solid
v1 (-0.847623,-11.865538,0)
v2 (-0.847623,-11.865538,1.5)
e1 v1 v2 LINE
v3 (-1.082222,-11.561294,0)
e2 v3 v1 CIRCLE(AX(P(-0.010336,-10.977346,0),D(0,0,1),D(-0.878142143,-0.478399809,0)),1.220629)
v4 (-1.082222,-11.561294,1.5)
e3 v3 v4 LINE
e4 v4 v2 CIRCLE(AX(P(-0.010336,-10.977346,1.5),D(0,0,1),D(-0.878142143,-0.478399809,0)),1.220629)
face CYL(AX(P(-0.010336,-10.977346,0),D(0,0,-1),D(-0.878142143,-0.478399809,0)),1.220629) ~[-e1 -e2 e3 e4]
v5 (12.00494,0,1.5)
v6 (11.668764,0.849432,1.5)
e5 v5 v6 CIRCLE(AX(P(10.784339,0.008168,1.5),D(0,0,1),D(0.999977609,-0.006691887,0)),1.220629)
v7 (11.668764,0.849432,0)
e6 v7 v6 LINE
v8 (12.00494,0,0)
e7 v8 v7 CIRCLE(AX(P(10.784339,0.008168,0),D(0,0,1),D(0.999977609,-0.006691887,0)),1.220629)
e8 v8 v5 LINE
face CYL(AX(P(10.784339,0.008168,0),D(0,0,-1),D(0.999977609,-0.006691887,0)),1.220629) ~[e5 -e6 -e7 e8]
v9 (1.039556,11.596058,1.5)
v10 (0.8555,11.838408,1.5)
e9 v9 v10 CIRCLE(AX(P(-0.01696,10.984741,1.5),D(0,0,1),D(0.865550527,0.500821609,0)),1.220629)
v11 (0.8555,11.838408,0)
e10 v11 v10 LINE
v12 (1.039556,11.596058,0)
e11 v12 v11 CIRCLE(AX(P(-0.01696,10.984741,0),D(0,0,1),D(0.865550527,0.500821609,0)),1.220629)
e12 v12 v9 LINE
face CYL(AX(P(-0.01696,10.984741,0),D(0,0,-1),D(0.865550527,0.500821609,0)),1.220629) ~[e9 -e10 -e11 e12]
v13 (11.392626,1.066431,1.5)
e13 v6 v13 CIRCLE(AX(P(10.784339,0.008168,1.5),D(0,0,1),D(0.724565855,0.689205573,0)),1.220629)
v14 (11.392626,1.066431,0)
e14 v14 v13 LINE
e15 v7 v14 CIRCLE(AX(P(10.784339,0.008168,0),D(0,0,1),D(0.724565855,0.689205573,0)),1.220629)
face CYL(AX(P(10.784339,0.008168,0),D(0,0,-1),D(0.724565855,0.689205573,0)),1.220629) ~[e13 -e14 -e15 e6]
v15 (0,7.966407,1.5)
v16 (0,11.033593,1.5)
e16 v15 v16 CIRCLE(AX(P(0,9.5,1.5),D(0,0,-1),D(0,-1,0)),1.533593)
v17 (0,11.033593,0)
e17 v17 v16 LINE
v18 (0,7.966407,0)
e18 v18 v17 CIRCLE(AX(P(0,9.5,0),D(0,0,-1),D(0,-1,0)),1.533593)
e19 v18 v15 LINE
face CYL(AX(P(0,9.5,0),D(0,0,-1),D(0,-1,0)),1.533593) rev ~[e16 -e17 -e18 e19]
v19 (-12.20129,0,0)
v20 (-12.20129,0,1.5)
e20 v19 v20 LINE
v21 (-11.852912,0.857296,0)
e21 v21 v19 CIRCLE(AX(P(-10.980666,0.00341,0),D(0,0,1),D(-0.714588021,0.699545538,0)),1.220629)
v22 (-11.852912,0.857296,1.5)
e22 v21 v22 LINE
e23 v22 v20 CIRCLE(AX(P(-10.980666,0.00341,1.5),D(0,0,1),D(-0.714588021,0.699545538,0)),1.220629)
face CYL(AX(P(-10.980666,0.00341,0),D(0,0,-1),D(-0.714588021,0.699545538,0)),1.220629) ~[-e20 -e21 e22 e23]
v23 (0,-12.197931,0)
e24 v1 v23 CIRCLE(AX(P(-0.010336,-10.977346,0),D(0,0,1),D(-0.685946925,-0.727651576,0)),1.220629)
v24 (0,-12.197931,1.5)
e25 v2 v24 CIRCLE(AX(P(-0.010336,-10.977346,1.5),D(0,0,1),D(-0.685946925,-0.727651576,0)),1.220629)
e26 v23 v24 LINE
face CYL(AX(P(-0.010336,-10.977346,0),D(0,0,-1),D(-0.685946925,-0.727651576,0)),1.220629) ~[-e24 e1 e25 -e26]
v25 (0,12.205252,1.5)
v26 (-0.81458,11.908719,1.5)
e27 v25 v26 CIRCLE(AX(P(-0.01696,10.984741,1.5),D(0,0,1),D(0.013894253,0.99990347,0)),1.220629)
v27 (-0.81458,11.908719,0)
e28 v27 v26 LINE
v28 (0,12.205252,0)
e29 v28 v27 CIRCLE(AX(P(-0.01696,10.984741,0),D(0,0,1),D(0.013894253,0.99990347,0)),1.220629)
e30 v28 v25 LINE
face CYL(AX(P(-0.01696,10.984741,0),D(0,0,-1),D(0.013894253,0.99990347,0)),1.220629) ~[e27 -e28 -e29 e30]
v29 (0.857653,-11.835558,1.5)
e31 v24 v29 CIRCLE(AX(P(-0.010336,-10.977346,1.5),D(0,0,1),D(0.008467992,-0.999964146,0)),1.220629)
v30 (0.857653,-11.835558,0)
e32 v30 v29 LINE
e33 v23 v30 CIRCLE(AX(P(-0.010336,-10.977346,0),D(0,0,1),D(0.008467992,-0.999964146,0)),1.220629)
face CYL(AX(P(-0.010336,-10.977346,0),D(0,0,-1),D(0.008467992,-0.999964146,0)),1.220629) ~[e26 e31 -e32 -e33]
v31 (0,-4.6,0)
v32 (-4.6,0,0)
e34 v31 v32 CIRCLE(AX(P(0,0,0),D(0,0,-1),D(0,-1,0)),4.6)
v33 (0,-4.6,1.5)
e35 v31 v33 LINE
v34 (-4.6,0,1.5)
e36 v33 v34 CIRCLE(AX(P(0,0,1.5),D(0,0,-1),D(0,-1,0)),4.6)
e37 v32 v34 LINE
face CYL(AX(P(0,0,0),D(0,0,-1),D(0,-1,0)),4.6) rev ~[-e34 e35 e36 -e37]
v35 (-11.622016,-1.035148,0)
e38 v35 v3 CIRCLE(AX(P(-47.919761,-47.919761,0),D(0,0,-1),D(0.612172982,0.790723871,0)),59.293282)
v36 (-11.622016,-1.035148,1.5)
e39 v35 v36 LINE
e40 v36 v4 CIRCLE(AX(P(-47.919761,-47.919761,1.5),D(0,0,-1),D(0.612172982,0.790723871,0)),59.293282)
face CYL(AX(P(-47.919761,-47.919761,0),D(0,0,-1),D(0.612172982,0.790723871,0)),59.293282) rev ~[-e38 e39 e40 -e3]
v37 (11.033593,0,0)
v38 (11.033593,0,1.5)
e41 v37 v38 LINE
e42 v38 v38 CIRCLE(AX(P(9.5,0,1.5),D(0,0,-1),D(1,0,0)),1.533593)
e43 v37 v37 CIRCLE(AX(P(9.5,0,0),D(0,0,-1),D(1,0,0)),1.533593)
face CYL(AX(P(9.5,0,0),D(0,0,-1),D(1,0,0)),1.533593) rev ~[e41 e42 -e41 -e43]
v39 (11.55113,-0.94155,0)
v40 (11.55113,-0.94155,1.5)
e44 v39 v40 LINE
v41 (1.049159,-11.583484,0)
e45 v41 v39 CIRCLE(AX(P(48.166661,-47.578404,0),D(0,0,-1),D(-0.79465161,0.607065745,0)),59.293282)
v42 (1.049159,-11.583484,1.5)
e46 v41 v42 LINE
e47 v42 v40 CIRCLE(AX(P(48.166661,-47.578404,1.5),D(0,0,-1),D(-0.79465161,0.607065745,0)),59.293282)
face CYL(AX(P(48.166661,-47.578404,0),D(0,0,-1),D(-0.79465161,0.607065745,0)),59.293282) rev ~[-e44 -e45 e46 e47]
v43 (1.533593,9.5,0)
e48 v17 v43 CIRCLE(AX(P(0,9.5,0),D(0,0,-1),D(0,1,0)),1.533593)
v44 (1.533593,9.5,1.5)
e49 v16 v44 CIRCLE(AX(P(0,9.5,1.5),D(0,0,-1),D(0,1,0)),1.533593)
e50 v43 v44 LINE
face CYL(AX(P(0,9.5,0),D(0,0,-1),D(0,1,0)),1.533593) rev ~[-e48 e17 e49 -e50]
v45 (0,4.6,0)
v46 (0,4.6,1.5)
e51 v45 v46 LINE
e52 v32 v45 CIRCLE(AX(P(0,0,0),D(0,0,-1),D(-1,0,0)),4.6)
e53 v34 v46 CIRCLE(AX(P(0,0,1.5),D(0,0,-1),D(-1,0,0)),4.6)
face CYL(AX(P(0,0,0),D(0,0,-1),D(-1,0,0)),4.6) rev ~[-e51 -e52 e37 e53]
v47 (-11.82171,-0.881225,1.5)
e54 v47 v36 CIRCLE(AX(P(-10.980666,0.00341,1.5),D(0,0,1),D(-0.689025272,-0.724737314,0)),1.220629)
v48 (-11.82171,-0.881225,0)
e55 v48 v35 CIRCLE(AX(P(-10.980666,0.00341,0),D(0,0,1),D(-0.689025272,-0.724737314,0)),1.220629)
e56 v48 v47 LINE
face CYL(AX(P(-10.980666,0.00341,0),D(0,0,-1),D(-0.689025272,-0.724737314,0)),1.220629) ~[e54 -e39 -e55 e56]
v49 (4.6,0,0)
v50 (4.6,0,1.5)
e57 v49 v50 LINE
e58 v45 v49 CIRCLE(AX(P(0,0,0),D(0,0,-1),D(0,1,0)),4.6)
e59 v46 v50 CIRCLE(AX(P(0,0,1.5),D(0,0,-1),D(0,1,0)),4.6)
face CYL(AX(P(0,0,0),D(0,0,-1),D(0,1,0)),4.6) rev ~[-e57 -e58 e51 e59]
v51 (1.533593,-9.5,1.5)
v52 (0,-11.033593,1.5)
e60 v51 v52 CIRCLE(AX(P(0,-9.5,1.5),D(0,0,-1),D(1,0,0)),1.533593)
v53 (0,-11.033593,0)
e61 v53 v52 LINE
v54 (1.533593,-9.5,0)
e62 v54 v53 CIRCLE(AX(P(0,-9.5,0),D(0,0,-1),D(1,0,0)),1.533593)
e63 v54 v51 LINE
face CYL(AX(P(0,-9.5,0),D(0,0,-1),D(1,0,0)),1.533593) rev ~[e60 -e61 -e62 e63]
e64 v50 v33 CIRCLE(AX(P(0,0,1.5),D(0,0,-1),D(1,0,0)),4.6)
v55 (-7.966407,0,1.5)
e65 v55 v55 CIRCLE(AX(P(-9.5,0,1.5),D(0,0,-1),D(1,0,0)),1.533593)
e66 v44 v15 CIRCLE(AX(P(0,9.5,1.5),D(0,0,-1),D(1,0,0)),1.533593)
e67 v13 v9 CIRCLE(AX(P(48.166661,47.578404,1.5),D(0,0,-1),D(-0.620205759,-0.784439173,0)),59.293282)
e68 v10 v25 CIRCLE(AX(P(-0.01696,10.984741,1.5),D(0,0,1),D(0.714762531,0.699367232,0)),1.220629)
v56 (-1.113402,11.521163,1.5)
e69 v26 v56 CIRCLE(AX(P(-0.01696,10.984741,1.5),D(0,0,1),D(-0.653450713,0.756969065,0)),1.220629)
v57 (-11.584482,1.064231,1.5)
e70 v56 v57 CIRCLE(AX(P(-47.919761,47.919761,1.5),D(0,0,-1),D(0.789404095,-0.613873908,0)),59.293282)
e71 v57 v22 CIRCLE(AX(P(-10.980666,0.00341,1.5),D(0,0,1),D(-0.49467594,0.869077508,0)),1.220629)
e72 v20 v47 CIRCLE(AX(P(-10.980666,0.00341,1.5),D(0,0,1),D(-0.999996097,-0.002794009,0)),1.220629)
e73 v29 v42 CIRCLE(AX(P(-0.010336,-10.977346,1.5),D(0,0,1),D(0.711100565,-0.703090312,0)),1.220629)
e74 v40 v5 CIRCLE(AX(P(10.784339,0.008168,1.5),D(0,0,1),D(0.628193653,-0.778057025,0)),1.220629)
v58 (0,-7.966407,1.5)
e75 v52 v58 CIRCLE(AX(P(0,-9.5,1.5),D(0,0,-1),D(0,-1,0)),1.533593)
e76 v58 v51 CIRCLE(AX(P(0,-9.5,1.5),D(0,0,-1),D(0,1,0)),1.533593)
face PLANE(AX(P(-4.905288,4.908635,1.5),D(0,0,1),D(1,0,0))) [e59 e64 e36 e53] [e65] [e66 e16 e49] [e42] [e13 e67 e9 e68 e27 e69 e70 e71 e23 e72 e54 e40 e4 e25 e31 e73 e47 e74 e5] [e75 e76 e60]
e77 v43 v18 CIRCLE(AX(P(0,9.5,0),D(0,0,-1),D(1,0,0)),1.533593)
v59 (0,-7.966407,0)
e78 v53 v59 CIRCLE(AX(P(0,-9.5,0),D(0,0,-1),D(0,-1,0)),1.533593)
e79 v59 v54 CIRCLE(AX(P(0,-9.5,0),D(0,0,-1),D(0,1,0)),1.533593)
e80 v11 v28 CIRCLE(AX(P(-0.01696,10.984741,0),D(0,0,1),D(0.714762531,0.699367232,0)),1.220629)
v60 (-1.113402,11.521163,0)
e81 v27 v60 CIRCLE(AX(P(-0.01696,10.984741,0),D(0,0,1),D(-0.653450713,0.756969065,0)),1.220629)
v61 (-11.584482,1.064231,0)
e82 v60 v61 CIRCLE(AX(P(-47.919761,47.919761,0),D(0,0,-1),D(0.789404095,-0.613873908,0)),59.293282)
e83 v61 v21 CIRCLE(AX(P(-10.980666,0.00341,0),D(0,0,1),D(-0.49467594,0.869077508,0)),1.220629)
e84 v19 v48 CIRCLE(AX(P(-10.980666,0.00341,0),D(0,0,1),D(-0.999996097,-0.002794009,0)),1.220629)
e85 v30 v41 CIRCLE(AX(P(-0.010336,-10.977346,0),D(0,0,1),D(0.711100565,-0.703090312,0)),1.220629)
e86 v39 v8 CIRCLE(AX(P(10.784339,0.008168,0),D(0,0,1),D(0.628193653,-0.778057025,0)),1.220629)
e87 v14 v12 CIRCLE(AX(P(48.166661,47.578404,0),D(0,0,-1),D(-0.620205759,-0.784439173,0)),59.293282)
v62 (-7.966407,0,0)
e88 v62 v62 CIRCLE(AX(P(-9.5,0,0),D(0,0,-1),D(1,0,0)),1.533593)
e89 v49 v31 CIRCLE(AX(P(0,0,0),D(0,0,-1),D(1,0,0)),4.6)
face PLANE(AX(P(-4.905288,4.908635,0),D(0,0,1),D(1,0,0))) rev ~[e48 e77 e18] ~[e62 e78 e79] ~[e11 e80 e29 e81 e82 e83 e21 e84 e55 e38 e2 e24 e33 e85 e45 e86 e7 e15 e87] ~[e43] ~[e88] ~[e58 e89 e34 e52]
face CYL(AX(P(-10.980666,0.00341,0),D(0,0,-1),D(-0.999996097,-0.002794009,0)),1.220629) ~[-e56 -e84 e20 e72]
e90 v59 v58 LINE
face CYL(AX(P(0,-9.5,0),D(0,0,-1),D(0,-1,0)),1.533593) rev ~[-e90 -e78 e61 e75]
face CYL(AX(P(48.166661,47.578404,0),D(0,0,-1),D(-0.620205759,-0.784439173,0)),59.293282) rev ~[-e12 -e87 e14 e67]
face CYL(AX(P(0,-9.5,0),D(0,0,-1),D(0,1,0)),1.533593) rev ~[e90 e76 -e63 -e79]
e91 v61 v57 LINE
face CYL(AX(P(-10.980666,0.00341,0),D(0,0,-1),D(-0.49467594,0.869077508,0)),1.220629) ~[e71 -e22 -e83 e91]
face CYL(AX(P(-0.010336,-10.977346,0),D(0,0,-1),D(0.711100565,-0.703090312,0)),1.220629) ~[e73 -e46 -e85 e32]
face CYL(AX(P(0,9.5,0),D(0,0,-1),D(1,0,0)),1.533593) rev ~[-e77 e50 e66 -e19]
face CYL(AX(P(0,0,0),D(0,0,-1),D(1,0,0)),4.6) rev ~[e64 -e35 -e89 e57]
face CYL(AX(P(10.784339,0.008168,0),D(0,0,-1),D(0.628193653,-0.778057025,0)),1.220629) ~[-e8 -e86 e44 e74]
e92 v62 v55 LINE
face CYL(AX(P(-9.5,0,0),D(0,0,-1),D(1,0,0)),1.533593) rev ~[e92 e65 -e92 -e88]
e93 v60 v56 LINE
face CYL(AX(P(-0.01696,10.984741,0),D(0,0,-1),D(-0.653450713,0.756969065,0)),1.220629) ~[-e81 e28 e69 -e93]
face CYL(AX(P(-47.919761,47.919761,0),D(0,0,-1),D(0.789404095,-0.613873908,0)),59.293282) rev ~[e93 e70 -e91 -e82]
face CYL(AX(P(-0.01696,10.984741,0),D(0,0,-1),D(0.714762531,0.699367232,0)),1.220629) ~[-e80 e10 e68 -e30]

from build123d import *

# Parameters (mm, degrees)
F1_DEPTH = 1.5


with BuildPart() as f1:
    # F0 (on Top) → F1 (new body)
    with BuildSketch(Plane.XY):
        with BuildLine():
            ThreePointArc((-11.0335932724, 0), (-9.5, 1.5335932724), (-7.9664067276, 0))
            Line((-7.9664067276, 0), (-4.6, 0))
            ThreePointArc((-4.6, 0), (-3.2526911935, 3.2526911935), (0, 4.6))
            Line((0, 4.6), (0, 7.9664067276))
            ThreePointArc((0, 7.9664067276), (-1.5335932724, 9.5), (0, 11.0335932724))
            Line((0, 11.0335932724), (0, 12.2052515495))
            ThreePointArc((0, 12.2052515495), (-0.4345010394, 12.1317339839), (-0.8145803081, 11.9087188829))
            ThreePointArc((-0.8145803081, 11.9087188829), (-0.9635912872, 11.7146325201), (-1.1134019503, 11.5211627464))
            ThreePointArc((-1.1134019503, 11.5211627464), (-6.0214332546, 5.9647454006), (-11.5844815273, 1.064231252))
            ThreePointArc((-11.5844815273, 1.064231252), (-11.7185491453, 0.9605716693), (-11.8529124882, 0.8572956927))
            ThreePointArc((-11.8529124882, 0.8572956927), (-12.1114910997, 0.4629412091), (-12.2012897293, 0))
            Line((-12.2012897293, 0), (-11.0335932724, 0))
        make_face()
        with BuildLine():
            Line((-4.6, 0), (-7.9664067276, 0))
            ThreePointArc((-7.9664067276, 0), (-9.5, -1.5335932724), (-11.0335932724, 0))
            Line((-11.0335932724, 0), (-12.2012897293, 0))
            ThreePointArc((-12.2012897293, 0), (-12.1017179659, -0.4794729938), (-11.8217098669, -0.8812245989))
            ThreePointArc((-11.8217098669, -0.8812245989), (-11.721781237, -0.9580802015), (-11.6220162383, -1.0351480919))
            ThreePointArc((-11.6220162383, -1.0351480919), (-6.0202525949, -5.9659244981), (-1.0822216309, -11.5612941984))
            ThreePointArc((-1.0822216309, -11.5612941984), (-0.9646757294, -11.7132260984), (-0.8476226636, -11.8655380184))
            ThreePointArc((-0.8476226636, -11.8655380184), (-0.4559625925, -12.1137220892), (0, -12.1979305118))
            Line((0, -12.1979305118), (0, -11.0335932724))
            ThreePointArc((0, -11.0335932724), (-1.5335932724, -9.5), (0, -7.9664067276))
            Line((0, -7.9664067276), (0, -4.6))
            ThreePointArc((0, -4.6), (-3.2526911935, -3.2526911935), (-4.6, 0))
        make_face()
        with BuildLine():
            Line((0, 7.9664067276), (0, 4.6))
            ThreePointArc((0, 4.6), (3.2526911935, 3.2526911935), (4.6, 0))
            Line((4.6, 0), (7.9664067276, 0))
            ThreePointArc((7.9664067276, 0), (9.5, 1.5335932724), (11.0335932724, 0))
            Line((11.0335932724, 0), (12.0049398392, 0))
            ThreePointArc((12.0049398392, 0), (11.9193137164, 0.4573515512), (11.6687643937, 0.849432297))
            ThreePointArc((11.6687643937, 0.849432297), (11.5305346329, 0.9577272788), (11.3926261985, 1.0664311591))
            ThreePointArc((11.3926261985, 1.0664311591), (5.8870136821, 6.0076850195), (1.0395559509, 11.5960579882))
            ThreePointArc((1.0395559509, 11.5960579882), (0.9473724033, 11.7171151321), (0.8554998188, 11.838408441))
            ThreePointArc((0.8554998188, 11.838408441), (0.4640913385, 12.1065803567), (0, 12.2052515495))
            Line((0, 12.2052515495), (0, 11.0335932724))
            ThreePointArc((0, 11.0335932724), (1.0844142025, 10.5844142025), (1.5335932724, 9.5))
            ThreePointArc((1.5335932724, 9.5), (1.0844142025, 8.4155857975), (0, 7.9664067276))
        make_face()
        with BuildLine():
            ThreePointArc((4.6, 0), (3.2526911935, -3.2526911935), (0, -4.6))
            Line((0, -4.6), (0, -7.9664067276))
            ThreePointArc((0, -7.9664067276), (1.0844142025, -8.4155857975), (1.5335932724, -9.5))
            ThreePointArc((1.5335932724, -9.5), (1.0844142025, -10.5844142025), (0, -11.0335932724))
            Line((0, -11.0335932724), (0, -12.1979305118))
            ThreePointArc((0, -12.1979305118), (0.4647348704, -12.1017306528), (0.8576533678, -11.8355578385))
            ThreePointArc((0.8576533678, -11.8355578385), (0.9532380505, -11.7093930262), (1.0491591917, -11.5834838282))
            ThreePointArc((1.0491591917, -11.5834838282), (5.9633685423, -5.9301704288), (11.5511297333, -0.9415502985))
            ThreePointArc((11.5511297333, -0.9415502985), (11.8839118623, -0.5218059727), (12.0049398392, 0))
            Line((12.0049398392, 0), (11.0335932724, 0))
            ThreePointArc((11.0335932724, 0), (9.5, -1.5335932724), (7.9664067276, 0))
            Line((7.9664067276, 0), (4.6, 0))
        make_face()
        with BuildLine():
            ThreePointArc((-11.5844815273, 1.064231252), (-11.7259145151, 0.970125819), (-11.8529124882, 0.8572956927))
            ThreePointArc((-11.8529124882, 0.8572956927), (-11.7185491453, 0.9605716693), (-11.5844815273, 1.064231252))
        make_face()
        with BuildLine():
            ThreePointArc((-11.6220162383, -1.0351480919), (-11.721781237, -0.9580802015), (-11.8217098669, -0.8812245989))
            ThreePointArc((-11.8217098669, -0.8812245989), (-11.7258479783, -0.9633562144), (-11.6220162383, -1.0351480919))
        make_face()
        with BuildLine():
            ThreePointArc((-0.8145803081, 11.9087188829), (-0.9836129307, 11.7300700266), (-1.1134019503, 11.5211627464))
            ThreePointArc((-1.1134019503, 11.5211627464), (-0.9635912872, 11.7146325201), (-0.8145803081, 11.9087188829))
        make_face()
        with BuildLine():
            ThreePointArc((-0.8476226636, -11.8655380184), (-0.9646757294, -11.7132260984), (-1.0822216309, -11.5612941984))
            ThreePointArc((-1.0822216309, -11.5612941984), (-0.9769671574, -11.7227038795), (-0.8476226636, -11.8655380184))
        make_face()
        with BuildLine():
            ThreePointArc((1.0395559509, 11.5960579882), (0.9551101208, 11.72299164), (0.8554998188, 11.838408441))
            ThreePointArc((0.8554998188, 11.838408441), (0.9473724033, 11.7171151321), (1.0395559509, 11.5960579882))
        make_face()
        with BuildLine():
            ThreePointArc((1.0491591917, -11.5834838282), (0.9532380505, -11.7093930262), (0.8576533678, -11.8355578385))
            ThreePointArc((0.8576533678, -11.8355578385), (0.9616128176, -11.7157555094), (1.0491591917, -11.5834838282))
        make_face()
        with BuildLine():
            ThreePointArc((11.3926261985, 1.0664311591), (11.5305346329, 0.9577272788), (11.6687643937, 0.849432297))
            ThreePointArc((11.6687643937, 0.849432297), (11.5385404595, 0.9679149567), (11.3926261985, 1.0664311591))
        make_face()
    extrude(amount=F1_DEPTH)


solid = f1.part
